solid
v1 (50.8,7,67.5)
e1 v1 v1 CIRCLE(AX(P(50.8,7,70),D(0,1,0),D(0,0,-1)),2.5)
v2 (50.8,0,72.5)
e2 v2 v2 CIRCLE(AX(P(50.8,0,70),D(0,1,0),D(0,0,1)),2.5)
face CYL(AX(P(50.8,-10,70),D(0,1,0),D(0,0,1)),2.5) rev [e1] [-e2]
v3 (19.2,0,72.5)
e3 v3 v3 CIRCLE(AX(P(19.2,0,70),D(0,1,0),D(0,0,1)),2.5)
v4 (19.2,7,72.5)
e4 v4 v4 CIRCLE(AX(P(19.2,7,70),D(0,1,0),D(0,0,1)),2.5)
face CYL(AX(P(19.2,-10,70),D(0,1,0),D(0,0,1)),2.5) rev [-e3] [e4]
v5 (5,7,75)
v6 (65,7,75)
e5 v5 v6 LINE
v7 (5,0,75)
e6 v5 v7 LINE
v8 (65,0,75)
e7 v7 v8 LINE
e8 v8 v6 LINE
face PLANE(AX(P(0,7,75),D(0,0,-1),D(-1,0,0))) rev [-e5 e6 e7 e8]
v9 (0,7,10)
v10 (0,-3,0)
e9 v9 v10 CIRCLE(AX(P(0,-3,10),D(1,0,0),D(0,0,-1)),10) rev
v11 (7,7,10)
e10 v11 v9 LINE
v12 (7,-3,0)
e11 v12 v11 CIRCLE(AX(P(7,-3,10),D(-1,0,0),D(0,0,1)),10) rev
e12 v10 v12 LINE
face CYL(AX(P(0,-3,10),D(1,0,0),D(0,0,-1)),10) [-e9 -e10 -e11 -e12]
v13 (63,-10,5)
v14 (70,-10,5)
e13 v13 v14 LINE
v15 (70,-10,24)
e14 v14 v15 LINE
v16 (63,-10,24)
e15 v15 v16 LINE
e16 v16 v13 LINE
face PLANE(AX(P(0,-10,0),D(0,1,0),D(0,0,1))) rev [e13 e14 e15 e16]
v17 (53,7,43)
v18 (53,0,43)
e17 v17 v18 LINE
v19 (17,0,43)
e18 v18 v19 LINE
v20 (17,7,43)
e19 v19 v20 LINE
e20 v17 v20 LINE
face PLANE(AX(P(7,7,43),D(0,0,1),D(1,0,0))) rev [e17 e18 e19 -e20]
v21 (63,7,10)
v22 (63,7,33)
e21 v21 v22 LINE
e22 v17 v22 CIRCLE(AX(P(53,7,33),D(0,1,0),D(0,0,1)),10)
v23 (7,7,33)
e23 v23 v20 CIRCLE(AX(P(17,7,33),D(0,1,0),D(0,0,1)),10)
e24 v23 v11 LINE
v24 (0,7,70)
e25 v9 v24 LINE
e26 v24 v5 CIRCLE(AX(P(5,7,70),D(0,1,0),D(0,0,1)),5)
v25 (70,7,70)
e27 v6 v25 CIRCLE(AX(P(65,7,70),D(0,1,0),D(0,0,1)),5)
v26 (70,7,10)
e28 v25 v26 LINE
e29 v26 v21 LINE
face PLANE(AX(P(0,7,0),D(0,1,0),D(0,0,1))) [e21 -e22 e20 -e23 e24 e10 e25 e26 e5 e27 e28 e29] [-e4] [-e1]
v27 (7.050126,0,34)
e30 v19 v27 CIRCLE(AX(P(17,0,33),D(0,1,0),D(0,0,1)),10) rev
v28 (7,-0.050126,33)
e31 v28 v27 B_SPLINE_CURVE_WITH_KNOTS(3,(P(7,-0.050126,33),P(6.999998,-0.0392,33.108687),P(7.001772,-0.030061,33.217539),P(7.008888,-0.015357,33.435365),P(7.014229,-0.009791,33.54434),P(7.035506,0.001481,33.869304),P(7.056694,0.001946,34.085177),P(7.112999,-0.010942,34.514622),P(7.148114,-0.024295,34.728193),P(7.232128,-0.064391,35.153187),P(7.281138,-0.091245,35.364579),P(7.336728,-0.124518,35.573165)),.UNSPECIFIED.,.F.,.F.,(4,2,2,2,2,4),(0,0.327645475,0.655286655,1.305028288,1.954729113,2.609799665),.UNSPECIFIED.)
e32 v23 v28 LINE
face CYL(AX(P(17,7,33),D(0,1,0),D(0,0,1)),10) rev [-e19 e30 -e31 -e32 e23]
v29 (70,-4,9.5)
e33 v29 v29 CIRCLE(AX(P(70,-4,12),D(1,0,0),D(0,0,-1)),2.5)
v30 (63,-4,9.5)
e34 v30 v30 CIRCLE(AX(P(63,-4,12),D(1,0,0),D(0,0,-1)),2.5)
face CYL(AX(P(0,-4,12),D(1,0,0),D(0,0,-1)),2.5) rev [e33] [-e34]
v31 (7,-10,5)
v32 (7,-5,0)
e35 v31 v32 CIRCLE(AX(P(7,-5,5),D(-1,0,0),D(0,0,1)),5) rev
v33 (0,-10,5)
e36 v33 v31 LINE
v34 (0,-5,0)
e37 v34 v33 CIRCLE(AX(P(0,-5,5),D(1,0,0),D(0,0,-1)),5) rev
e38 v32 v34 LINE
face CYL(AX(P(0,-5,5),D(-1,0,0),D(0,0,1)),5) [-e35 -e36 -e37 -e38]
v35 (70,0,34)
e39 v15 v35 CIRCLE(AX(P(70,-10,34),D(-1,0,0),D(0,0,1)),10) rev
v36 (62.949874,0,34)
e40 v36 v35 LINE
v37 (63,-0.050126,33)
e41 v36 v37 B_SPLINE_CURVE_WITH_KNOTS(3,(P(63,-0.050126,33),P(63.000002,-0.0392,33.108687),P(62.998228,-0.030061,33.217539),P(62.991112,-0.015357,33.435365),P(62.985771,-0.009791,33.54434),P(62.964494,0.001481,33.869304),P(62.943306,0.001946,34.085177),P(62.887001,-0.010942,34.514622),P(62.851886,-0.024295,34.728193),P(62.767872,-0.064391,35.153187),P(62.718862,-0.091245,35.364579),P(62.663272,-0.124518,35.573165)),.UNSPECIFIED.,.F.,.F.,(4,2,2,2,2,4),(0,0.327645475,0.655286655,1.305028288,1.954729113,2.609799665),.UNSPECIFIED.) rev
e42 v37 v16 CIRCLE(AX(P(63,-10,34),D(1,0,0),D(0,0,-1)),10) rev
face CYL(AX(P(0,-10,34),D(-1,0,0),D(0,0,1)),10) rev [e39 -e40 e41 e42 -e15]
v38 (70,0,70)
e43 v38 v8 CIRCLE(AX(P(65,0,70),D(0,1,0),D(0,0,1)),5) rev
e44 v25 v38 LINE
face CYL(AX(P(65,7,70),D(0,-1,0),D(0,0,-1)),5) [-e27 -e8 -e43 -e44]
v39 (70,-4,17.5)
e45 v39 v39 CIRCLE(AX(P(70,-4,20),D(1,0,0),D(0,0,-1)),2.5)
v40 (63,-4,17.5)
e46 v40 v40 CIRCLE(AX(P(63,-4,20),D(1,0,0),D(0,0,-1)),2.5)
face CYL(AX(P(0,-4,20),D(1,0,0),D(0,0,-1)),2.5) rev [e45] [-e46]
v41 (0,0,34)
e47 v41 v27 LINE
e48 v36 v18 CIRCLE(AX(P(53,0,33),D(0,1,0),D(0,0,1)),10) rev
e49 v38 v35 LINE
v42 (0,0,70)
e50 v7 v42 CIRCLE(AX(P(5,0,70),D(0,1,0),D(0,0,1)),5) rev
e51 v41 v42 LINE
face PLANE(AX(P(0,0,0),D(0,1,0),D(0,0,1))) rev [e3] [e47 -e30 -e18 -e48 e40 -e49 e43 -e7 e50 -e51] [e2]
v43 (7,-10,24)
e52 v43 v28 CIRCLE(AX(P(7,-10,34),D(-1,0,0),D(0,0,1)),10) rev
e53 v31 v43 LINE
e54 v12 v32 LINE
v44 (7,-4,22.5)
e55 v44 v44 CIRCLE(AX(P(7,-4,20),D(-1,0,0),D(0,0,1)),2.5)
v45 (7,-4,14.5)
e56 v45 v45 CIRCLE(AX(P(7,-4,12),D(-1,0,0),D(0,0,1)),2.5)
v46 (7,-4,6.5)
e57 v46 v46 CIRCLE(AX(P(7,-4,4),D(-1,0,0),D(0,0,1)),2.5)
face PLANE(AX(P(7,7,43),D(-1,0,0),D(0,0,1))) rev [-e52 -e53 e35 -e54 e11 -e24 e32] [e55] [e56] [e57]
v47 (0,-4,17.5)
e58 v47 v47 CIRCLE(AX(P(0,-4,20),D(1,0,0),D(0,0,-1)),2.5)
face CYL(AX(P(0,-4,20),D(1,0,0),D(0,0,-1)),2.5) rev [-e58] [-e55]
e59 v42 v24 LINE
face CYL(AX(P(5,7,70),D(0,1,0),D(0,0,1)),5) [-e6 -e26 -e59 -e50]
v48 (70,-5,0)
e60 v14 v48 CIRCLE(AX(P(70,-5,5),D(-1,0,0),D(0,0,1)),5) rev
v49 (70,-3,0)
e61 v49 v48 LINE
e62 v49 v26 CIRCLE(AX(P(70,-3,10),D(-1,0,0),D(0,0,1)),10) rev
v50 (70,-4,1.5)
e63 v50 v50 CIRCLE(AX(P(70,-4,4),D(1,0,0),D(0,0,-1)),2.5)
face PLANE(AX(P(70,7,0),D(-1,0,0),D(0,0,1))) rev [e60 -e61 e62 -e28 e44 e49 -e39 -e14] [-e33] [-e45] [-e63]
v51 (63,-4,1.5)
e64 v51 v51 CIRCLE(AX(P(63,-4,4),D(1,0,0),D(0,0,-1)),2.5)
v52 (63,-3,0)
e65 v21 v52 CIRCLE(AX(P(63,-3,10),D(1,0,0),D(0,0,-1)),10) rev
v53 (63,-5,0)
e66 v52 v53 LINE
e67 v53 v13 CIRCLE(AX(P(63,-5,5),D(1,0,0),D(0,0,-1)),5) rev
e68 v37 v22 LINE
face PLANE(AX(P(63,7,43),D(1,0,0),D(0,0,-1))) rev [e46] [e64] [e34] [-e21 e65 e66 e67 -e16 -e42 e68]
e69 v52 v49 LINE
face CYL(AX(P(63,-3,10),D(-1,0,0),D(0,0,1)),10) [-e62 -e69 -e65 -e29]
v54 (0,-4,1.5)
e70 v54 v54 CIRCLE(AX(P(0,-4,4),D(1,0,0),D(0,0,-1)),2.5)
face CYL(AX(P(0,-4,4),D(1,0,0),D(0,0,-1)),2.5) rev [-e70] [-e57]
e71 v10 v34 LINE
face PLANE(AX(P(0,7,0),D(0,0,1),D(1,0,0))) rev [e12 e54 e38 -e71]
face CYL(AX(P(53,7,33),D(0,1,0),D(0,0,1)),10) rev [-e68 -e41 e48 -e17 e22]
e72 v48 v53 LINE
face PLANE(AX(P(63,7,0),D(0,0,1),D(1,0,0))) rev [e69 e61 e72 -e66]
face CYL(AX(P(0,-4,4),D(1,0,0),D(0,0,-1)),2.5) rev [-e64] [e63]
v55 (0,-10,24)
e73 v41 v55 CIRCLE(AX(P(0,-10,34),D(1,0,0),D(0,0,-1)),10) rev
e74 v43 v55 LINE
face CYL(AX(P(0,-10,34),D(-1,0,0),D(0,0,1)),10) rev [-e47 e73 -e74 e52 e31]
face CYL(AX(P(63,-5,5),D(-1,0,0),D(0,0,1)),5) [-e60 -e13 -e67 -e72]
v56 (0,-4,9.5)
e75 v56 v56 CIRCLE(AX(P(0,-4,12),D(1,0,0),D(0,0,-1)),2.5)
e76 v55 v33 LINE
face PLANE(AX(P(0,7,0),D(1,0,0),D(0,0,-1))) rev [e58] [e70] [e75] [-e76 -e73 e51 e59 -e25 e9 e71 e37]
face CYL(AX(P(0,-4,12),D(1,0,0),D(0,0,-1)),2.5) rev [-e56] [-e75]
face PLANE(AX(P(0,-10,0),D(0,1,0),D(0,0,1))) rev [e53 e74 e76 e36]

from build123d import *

# Parameters (mm, degrees)
EXTRUDE_1_DEPTH     = 7
SKETCH_2_W          = 7
SKETCH_2_H          = 24
EXTRUDE_2_DEPTH     = 10
FILLET_1_R          = 10
FILLET_2_R          = 10
SKETCH_3_R          = 2.5
CUT_EXTRUDE_1_DEPTH = 104.07764064
FILLET_3_R          = 10
FILLET_4_R          = 10
FILLET_5_R          = 10
FILLET_6_R          = 10
FILLET_8_R          = 5
FILLET_9_R          = 5
SKETCH_4_R          = 2.5
CUT_EXTRUDE_2_DEPTH = 104.077640708
SKETCH_5_R          = 2.5
CUT_EXTRUDE_3_DEPTH = 104.990384238
FILLET_10_R         = 5
FILLET_11_R         = 5


with BuildPart() as part:
    # 草图1 → 凸台-拉伸1 (new body)
    with BuildSketch(Plane(origin=(0, 0, 0), x_dir=(1, 0, 0), z_dir=(0, 1, 0))):
        Polygon((0, 0), (7, 0), (7, -43), (35, -43), (63, -43), (63, 0), (70, 0), (70, -75), (0, -75), align=None)
    extrude(amount=EXTRUDE_1_DEPTH)

    # 草图2 → 凸台-拉伸2 (add)
    with BuildSketch(Plane.XZ):
        with Locations((3.5, 12)):
            Rectangle(SKETCH_2_W, SKETCH_2_H)
        with Locations((66.5, 12)):
            Rectangle(SKETCH_2_W, SKETCH_2_H)
    extrude(amount=EXTRUDE_2_DEPTH)

    # 圆角1
    fillet_1_edges = [part.edges().sort_by_distance(p)[0] for p in [
        (3.5, 0, 24),
    ]]
    fillet(fillet_1_edges, radius=FILLET_1_R - 0.0001)  # a hair under: the kernel refuses the full size

    # 圆角2
    fillet_2_edges = [part.edges().sort_by_distance(p)[0] for p in [
        (66.5, 0, 24),
    ]]
    fillet(fillet_2_edges, radius=FILLET_2_R - 0.0001)  # a hair under: the kernel refuses the full size

    # 草图3 → 切除-拉伸1 (cut, through all)
    with BuildSketch(Plane(origin=(70, 0, 0), x_dir=(0, 0, -1), z_dir=(1, 0, 0))):
        with Locations((-12, -4)):
            Circle(SKETCH_3_R)
    extrude(amount=-CUT_EXTRUDE_1_DEPTH, mode=Mode.SUBTRACT)

    # 圆角3
    fillet_3_edges = [part.edges().sort_by_distance(p)[0] for p in [
        (3.5, 7, 0),
    ]]
    fillet(fillet_3_edges, radius=FILLET_3_R)

    # 圆角4
    fillet_4_edges = [part.edges().sort_by_distance(p)[0] for p in [
        (66.5, 7, 0),
    ]]
    fillet(fillet_4_edges, radius=FILLET_4_R)

    # 圆角5
    fillet_5_edges = [part.edges().sort_by_distance(p)[0] for p in [
        (7, 3.5, 43),
    ]]
    fillet(fillet_5_edges, radius=FILLET_5_R)

    # 圆角6
    fillet_6_edges = [part.edges().sort_by_distance(p)[0] for p in [
        (63, 3.5, 43),
    ]]
    fillet(fillet_6_edges, radius=FILLET_6_R)

    # 圆角8
    fillet_8_edges = [part.edges().sort_by_distance(p)[0] for p in [
        (66.5, -10, 0),
    ]]
    fillet(fillet_8_edges, radius=FILLET_8_R)

    # 圆角9
    fillet_9_edges = [part.edges().sort_by_distance(p)[0] for p in [
        (3.5, -10, 0),
    ]]
    fillet(fillet_9_edges, radius=FILLET_9_R)

    # 草图4 → 切除-拉伸2 (cut, through all)
    with BuildSketch(Plane(origin=(70, 0, 0), x_dir=(0, 0, -1), z_dir=(1, 0, 0))):
        with Locations((-4, -4)):
            Circle(SKETCH_4_R)
        with Locations((-20, -4)):
            Circle(SKETCH_4_R)
    extrude(amount=-CUT_EXTRUDE_2_DEPTH, mode=Mode.SUBTRACT)

    # 草图5 → 切除-拉伸3 (cut, through all)
    with BuildSketch(Plane(origin=(0, 7, 0), x_dir=(1, 0, 0), z_dir=(0, 1, 0))):
        with Locations(Location((19.2, -70, 0), (0, 0, 270))):
            Circle(SKETCH_5_R)
        with Locations(Location((50.8, -70, 0), (0, 0, 270))):
            Circle(SKETCH_5_R)
    extrude(amount=-CUT_EXTRUDE_3_DEPTH, mode=Mode.SUBTRACT)

    # 圆角10
    fillet_10_edges = [part.edges().sort_by_distance(p)[0] for p in [
        (0, 3.5, 75),
    ]]
    fillet(fillet_10_edges, radius=FILLET_10_R)

    # 圆角11
    fillet_11_edges = [part.edges().sort_by_distance(p)[0] for p in [
        (70, 3.5, 75),
    ]]
    fillet(fillet_11_edges, radius=FILLET_11_R)


solid = part.part
